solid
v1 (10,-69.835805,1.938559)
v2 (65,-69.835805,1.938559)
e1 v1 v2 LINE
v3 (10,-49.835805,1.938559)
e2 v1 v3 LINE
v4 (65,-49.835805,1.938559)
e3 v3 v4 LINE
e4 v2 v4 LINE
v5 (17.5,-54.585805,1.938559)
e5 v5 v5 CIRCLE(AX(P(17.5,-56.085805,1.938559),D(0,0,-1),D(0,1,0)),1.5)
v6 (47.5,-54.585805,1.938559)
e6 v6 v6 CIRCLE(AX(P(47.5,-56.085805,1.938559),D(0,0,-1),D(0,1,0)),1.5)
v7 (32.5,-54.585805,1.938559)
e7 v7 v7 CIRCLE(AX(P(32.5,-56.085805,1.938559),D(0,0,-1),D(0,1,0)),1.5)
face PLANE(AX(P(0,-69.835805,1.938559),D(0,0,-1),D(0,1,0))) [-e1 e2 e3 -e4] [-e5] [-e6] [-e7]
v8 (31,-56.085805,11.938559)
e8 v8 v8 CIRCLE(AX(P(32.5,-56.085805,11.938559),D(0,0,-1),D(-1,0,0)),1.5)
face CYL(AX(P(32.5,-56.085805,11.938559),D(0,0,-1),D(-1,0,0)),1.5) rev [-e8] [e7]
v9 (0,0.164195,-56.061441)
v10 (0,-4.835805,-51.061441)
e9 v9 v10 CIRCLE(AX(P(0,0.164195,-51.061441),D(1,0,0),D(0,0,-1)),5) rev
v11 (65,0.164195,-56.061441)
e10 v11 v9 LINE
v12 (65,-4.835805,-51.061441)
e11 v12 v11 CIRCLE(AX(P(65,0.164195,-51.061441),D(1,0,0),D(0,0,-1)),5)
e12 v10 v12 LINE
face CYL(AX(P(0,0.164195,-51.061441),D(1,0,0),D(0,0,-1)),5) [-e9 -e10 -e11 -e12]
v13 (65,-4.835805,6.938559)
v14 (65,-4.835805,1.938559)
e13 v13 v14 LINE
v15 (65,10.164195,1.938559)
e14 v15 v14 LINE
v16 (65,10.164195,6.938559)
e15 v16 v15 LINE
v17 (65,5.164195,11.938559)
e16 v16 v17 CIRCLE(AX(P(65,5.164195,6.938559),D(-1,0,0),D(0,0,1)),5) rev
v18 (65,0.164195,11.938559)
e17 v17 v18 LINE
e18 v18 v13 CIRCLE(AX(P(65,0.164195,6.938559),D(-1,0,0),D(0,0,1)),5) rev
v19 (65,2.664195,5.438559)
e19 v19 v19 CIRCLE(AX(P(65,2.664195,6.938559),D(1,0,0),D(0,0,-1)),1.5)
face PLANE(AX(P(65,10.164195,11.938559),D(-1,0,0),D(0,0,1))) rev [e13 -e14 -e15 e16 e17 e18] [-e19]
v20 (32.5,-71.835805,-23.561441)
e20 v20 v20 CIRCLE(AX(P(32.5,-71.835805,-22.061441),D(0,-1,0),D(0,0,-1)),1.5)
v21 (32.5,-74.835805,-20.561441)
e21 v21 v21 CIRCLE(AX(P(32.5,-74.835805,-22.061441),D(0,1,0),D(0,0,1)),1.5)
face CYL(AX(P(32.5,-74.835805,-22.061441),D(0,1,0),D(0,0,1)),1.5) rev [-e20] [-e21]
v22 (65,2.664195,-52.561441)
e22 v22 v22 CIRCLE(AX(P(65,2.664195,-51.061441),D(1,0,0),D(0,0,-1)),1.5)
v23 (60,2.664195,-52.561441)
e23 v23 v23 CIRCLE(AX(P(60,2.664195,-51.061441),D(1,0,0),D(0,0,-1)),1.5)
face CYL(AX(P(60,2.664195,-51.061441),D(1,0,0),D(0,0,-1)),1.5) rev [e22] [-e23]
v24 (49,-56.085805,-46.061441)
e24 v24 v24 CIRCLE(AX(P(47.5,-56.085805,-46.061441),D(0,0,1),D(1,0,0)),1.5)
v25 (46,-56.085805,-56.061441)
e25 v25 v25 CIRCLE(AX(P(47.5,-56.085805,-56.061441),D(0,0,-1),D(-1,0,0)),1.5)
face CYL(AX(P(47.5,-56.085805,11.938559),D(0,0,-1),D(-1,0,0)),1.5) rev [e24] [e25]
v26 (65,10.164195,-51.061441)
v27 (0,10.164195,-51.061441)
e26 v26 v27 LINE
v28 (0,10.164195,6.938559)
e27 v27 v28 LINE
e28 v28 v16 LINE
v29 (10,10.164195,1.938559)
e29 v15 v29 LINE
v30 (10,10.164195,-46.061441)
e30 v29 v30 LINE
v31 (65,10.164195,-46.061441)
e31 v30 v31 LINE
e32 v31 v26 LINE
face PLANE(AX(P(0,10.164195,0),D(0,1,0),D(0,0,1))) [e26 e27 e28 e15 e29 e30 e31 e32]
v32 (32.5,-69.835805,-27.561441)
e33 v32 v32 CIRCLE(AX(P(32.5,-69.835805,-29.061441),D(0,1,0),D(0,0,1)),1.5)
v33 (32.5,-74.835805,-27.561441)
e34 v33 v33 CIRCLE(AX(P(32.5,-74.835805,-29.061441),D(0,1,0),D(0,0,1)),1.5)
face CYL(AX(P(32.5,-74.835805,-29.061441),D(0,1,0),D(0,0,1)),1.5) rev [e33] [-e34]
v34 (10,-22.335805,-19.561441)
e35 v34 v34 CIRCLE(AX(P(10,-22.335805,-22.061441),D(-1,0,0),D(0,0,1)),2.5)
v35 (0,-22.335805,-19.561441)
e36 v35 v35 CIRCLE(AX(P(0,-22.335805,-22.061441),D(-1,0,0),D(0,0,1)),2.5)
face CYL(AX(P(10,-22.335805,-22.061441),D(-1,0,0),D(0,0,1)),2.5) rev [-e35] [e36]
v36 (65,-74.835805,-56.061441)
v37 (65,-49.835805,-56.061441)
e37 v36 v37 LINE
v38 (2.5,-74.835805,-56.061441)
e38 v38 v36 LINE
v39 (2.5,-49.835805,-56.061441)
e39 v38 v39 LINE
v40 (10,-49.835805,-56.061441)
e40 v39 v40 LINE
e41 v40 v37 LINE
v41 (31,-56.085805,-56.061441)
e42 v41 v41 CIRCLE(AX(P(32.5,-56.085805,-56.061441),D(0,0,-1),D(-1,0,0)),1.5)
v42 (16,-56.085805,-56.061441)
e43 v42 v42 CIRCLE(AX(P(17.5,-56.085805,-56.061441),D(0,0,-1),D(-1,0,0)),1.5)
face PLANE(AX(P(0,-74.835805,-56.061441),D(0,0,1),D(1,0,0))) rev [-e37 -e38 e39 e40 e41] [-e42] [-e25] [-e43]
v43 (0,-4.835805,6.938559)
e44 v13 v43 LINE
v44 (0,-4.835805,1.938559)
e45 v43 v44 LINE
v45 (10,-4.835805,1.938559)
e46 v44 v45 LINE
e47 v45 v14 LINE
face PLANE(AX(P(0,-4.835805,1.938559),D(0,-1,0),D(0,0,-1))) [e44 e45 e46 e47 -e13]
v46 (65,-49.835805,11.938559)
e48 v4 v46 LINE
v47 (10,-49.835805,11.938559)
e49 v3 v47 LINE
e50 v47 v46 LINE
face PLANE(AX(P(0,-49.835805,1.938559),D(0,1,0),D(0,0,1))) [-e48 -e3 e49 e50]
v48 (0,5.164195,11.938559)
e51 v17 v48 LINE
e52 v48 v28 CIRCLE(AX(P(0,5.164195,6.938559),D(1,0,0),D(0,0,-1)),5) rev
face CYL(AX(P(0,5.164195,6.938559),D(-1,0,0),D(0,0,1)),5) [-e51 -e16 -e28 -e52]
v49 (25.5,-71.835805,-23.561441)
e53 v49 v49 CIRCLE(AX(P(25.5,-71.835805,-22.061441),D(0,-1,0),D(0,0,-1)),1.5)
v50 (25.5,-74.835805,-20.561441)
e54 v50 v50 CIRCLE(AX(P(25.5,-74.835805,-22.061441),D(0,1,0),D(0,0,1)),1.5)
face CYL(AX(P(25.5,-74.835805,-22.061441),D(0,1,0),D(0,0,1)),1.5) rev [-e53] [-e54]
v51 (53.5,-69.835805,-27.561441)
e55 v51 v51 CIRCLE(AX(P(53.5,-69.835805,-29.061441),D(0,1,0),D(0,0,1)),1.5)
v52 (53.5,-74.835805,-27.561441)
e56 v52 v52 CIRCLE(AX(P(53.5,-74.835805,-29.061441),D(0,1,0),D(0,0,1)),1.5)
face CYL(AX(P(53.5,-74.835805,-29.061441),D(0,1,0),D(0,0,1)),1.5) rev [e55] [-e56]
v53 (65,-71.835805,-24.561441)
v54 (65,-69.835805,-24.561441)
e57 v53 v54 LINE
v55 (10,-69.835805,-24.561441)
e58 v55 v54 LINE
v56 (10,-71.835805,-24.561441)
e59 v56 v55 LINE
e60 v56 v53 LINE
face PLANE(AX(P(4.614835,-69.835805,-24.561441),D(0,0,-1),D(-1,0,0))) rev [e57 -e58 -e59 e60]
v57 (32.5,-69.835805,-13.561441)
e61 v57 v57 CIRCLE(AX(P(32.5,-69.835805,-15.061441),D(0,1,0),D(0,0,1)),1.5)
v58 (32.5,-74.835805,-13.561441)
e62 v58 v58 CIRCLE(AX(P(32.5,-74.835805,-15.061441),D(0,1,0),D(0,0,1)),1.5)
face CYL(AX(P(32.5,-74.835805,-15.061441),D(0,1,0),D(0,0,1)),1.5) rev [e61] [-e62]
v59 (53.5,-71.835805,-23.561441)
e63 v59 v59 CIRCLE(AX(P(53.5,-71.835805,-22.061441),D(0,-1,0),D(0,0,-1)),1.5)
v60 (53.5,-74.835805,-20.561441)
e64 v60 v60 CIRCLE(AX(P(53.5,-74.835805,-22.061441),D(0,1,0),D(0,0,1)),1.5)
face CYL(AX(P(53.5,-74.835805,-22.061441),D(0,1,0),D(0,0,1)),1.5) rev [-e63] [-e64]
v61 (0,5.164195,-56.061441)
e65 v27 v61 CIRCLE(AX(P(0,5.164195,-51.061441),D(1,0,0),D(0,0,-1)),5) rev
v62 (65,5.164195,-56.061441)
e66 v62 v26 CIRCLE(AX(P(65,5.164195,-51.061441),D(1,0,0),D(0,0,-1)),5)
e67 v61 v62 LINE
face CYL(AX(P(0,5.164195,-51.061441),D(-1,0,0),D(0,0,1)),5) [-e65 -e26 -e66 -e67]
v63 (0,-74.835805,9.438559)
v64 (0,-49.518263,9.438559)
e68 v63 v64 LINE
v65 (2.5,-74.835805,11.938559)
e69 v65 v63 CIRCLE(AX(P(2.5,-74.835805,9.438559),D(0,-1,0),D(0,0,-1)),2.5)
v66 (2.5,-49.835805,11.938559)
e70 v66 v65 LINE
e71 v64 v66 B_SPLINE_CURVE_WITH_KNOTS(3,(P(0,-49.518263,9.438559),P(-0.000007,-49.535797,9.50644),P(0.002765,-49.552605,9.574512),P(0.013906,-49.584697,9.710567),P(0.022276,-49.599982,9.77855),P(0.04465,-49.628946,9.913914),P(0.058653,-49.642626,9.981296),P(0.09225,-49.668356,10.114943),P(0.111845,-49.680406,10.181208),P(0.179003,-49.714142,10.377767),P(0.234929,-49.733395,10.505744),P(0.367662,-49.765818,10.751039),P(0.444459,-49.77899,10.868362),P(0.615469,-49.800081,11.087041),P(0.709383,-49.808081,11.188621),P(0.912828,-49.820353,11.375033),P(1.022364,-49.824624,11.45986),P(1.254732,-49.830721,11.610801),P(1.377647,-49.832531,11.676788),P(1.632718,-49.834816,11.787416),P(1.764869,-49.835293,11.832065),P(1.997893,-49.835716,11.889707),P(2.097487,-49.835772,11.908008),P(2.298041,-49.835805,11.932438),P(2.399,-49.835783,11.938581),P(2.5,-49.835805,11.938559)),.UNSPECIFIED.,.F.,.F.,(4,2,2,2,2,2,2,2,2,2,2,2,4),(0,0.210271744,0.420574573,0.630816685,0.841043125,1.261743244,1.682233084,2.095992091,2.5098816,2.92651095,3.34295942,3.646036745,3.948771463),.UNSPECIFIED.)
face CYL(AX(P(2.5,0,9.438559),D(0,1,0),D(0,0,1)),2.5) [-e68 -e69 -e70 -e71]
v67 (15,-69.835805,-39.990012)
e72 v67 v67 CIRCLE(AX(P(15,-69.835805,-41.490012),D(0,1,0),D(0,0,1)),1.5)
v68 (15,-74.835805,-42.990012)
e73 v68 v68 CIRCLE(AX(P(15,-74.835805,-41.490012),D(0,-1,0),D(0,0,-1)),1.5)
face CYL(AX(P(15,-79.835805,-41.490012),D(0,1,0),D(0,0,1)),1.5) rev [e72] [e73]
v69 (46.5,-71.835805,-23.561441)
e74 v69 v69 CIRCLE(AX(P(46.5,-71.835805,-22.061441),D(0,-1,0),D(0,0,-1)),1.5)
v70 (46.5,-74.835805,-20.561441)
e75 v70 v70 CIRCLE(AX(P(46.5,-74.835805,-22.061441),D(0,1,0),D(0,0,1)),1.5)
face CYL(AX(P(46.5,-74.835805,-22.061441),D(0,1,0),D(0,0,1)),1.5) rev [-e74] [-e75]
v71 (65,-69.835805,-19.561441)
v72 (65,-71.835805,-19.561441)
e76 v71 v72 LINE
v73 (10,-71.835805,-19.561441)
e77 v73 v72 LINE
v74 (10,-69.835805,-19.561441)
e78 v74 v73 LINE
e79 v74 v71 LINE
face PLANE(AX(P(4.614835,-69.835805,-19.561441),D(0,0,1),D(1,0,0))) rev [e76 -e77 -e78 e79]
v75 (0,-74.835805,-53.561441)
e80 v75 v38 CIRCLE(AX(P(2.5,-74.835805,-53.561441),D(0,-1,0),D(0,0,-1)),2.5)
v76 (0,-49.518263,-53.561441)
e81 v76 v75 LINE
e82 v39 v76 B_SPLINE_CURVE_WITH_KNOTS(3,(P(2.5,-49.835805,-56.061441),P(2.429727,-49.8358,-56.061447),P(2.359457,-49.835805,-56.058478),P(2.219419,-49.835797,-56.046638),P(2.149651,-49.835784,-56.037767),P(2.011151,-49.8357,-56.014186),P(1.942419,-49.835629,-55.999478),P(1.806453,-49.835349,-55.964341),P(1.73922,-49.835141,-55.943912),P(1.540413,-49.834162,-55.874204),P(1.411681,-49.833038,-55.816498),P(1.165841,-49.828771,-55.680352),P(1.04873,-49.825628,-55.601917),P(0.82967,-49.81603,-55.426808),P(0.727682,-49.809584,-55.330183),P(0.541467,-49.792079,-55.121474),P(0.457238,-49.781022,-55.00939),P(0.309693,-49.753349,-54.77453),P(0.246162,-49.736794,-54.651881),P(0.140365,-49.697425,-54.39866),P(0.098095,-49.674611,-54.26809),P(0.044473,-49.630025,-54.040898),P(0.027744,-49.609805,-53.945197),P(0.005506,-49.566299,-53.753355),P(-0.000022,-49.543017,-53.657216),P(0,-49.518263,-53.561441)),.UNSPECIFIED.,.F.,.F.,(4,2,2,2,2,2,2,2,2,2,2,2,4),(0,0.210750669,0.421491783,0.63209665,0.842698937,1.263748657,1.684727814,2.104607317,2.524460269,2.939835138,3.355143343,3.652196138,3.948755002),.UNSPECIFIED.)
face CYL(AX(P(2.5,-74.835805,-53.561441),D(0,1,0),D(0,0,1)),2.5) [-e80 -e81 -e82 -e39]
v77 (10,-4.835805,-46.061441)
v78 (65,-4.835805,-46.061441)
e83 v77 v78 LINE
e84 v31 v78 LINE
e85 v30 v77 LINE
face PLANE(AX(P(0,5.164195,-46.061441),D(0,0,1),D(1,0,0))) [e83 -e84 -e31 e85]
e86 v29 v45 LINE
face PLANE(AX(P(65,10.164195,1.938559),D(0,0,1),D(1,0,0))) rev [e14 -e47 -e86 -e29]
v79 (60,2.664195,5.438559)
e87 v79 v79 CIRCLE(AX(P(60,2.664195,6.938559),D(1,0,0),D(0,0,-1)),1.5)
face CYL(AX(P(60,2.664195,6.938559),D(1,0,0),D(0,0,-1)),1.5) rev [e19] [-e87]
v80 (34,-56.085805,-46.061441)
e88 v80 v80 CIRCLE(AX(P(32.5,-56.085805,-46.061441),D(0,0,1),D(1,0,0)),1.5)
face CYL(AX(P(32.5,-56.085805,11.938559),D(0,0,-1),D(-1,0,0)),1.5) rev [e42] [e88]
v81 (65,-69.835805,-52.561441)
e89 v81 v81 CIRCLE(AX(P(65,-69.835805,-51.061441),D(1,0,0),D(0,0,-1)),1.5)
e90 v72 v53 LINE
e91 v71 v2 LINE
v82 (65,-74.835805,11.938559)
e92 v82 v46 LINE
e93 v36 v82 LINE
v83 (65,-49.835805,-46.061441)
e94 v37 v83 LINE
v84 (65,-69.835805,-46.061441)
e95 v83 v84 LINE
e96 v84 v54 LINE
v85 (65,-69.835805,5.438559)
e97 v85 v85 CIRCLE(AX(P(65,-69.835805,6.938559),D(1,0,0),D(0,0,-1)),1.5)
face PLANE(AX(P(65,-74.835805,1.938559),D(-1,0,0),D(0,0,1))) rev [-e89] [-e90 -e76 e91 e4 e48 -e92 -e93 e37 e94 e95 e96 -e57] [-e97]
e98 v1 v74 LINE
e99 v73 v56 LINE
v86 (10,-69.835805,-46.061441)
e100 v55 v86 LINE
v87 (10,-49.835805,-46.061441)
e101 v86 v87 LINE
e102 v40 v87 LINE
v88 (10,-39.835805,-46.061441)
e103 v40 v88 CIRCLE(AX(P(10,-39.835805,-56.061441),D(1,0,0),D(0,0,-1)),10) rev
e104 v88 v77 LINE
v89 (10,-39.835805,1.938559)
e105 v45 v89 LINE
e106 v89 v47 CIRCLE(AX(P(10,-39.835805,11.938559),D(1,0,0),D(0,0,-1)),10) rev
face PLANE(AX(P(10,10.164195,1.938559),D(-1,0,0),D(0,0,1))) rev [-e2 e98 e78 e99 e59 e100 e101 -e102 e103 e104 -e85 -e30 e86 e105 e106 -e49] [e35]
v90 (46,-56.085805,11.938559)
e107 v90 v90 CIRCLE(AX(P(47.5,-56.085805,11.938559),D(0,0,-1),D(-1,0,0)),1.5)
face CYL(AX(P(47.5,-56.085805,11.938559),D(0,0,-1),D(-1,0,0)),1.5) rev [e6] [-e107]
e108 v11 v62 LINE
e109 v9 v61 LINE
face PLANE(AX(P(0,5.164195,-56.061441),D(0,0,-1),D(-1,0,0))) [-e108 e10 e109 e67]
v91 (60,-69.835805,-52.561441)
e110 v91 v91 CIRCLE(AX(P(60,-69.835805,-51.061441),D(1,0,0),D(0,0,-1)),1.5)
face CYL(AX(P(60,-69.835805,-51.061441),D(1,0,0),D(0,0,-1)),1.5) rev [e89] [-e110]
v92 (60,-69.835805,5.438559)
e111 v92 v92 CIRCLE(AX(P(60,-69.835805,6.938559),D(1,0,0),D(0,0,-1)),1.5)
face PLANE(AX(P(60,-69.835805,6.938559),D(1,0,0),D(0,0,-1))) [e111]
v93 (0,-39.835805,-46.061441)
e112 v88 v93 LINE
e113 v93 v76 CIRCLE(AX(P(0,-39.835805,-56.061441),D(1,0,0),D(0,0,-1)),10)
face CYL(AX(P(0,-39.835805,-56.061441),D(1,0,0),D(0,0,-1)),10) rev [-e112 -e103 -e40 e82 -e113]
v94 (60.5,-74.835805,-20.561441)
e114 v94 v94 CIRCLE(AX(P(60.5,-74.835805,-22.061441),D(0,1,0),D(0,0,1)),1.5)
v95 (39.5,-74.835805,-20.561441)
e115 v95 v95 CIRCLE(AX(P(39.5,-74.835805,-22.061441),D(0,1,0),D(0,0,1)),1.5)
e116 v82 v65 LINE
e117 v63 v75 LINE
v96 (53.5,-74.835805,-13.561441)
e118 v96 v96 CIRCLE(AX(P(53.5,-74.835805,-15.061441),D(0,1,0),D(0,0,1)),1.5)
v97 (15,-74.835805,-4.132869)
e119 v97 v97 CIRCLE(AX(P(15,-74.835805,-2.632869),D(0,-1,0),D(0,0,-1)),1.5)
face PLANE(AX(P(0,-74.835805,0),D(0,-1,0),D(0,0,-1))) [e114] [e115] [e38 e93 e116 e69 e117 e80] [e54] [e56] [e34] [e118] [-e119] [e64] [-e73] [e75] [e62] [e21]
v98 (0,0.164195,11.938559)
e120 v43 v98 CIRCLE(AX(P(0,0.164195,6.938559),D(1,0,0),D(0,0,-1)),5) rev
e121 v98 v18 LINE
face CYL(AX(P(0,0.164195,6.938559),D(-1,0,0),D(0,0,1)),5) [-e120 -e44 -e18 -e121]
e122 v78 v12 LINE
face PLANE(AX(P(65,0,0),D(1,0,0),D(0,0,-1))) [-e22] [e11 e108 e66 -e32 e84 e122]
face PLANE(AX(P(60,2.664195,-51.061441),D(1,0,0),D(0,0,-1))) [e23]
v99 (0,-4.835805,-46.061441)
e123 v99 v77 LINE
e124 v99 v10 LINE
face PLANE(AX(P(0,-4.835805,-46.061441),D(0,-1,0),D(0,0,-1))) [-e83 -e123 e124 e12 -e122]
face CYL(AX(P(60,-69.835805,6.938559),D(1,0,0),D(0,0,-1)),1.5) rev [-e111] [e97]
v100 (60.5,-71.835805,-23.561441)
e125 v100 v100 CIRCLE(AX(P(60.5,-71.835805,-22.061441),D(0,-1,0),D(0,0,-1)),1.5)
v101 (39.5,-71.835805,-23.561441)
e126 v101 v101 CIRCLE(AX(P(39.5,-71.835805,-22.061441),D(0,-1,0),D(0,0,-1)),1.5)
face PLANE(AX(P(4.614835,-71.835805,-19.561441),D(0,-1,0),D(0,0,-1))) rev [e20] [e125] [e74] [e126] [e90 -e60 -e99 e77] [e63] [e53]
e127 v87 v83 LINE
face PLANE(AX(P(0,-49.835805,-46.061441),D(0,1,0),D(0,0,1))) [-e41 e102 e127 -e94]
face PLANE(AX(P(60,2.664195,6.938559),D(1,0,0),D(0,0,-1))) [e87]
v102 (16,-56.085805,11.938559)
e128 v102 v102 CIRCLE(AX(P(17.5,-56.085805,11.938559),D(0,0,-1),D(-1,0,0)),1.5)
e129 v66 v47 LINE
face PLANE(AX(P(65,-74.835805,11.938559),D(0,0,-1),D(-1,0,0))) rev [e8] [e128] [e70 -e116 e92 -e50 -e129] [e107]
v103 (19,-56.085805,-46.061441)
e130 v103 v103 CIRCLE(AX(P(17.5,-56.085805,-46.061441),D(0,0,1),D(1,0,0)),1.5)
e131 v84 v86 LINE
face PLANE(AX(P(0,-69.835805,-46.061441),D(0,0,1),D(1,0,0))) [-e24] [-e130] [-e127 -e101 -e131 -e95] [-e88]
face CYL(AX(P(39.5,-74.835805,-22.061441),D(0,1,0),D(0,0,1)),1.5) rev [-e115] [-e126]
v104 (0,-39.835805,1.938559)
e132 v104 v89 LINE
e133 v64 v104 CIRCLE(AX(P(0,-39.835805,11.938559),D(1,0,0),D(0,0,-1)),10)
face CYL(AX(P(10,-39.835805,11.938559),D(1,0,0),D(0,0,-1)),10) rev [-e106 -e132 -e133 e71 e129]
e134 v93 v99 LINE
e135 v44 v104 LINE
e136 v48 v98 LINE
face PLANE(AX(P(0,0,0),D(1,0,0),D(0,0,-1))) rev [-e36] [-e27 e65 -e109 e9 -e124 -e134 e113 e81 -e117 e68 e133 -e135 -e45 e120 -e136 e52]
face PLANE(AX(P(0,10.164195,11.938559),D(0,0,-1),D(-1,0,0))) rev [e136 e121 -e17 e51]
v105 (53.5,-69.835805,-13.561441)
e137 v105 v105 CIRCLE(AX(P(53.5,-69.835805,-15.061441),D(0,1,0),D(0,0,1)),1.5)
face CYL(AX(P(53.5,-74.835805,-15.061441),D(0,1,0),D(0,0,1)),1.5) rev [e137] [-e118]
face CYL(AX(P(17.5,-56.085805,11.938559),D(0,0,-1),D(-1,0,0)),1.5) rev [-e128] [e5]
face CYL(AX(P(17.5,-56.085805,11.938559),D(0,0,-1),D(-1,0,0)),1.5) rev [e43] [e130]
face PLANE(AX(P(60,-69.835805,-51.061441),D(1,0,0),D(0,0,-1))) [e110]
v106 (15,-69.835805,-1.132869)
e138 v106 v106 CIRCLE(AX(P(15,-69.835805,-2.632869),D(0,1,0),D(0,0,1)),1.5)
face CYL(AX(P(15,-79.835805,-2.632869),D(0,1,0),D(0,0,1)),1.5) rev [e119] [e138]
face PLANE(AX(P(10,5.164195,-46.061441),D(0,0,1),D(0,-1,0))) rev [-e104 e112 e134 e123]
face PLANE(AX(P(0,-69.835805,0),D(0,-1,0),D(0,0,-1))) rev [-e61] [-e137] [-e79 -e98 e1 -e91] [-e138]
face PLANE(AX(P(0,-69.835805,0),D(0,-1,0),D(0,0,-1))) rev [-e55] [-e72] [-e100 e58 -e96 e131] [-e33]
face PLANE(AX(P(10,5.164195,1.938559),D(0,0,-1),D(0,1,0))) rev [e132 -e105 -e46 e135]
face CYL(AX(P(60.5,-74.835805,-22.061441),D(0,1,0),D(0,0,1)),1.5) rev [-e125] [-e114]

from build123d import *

# Parameters (mm, degrees)
SKETCH_2_W                 = 48
SKETCH_2_H                 = 75
EXTRUDE_1_DEPTH            = 10
EXTRUDE_2_DEPTH            = 55
EXTRUDE_2_DEPTH_BACK       = 10
SKETCH_5_W                 = 10
SKETCH_5_H                 = 10
EXTRUDE_2_2_DEPTH          = 55
EXTRUDE_2_2_DEPTH_BACK     = 10
SKETCH_5_H_2               = 20
EXTRUDE_2_3_DEPTH          = 55
EXTRUDE_2_3_DEPTH_BACK     = 10
EXTRUDE_2_4_DEPTH          = 55
EXTRUDE_2_4_DEPTH_BACK     = 10
EXTRUDE_3_DEPTH            = 5
SKETCH_7_R                 = 2.5
CUT_EXTRUDE_1_DEPTH        = 10
FILLET_1_R                 = 10
SKETCH_8_R                 = 1.5
CUT_EXTRUDE_2_DEPTH        = 121.205647632
PATTERN_LINEAR_1_COUNT     = 2
PATTERN_LINEAR_1_PITCH     = 15
PATTERN_LINEAR_1_COL_COUNT = 2
PATTERN_LINEAR_1_COL_PITCH = 15
SKETCH_10_R                = 1.5
CUT_EXTRUDE_4_DEPTH        = 10
SKETCH_11_R                = 1.5
CUT_EXTRUDE_5_DEPTH        = 5
FILLET_9_R                 = 2.5
EXTRUDE_5_DEPTH            = 5
FILLET_10_R                = 5
FILLET_11_R                = 5
SKETCH_14_R                = 1.5
CUT_EXTRUDE_6_DEPTH        = 5
SKETCH_15_W                = 5
SKETCH_15_H                = 2
CUT_EXTRUDE_7_DEPTH        = 55
SKETCH_17_R                = 1.5
CUT_EXTRUDE_10_DEPTH       = 118.336631714


with BuildPart() as part:
    # 草图2 → 凸台-拉伸1 (new body)
    with BuildSketch(Plane(origin=(0, 0, 0), x_dir=(0, 0, -1), z_dir=(1, 0, 0))):
        with Locations((22.061440678, -32.335805085)):
            Rectangle(SKETCH_2_W, SKETCH_2_H)
    extrude(amount=EXTRUDE_1_DEPTH)



with BuildPart() as body_2:
    # 草图5 → 凸台-拉伸2 (new, two sides: drawn at the far end of the back side and taken through both)
    with BuildSketch(Plane(origin=(10, 0, 0), x_dir=(0, 0, -1), z_dir=(1, 0, 0)).offset(-EXTRUDE_2_DEPTH_BACK)):
        with Locations((51.061440678, 0.164194915)):
            Rectangle(SKETCH_5_W, SKETCH_5_H)
    extrude(amount=EXTRUDE_2_DEPTH + EXTRUDE_2_DEPTH_BACK)


with BuildPart() as body_3:
    # 草图5 → Extrude 2 2 (new, two sides: drawn at the far end of the back side and taken through both)
    with BuildSketch(Plane(origin=(10, 0, 0), x_dir=(0, 0, -1), z_dir=(1, 0, 0)).offset(-EXTRUDE_2_2_DEPTH_BACK)):
        with Locations((51.061440678, -59.835805085)):
            Rectangle(SKETCH_5_W, SKETCH_5_H_2)
    extrude(amount=EXTRUDE_2_2_DEPTH + EXTRUDE_2_2_DEPTH_BACK)


with BuildPart() as body_4:
    # 草图5 → Extrude 2 3 (new, two sides: drawn at the far end of the back side and taken through both)
    with BuildSketch(Plane(origin=(10, 0, 0), x_dir=(0, 0, -1), z_dir=(1, 0, 0)).offset(-EXTRUDE_2_3_DEPTH_BACK)):
        with Locations((-6.938559322, -59.835805085)):
            Rectangle(SKETCH_5_W, SKETCH_5_H_2)
    extrude(amount=EXTRUDE_2_3_DEPTH + EXTRUDE_2_3_DEPTH_BACK)


with BuildPart() as body_5:
    # 草图5 → Extrude 2 4 (new, two sides: drawn at the far end of the back side and taken through both)
    with BuildSketch(Plane(origin=(10, 0, 0), x_dir=(0, 0, -1), z_dir=(1, 0, 0)).offset(-EXTRUDE_2_4_DEPTH_BACK)):
        with Locations((-6.938559322, 0.164194915)):
            Rectangle(SKETCH_5_W, SKETCH_5_H)
    extrude(amount=EXTRUDE_2_4_DEPTH + EXTRUDE_2_4_DEPTH_BACK)


with BuildPart() as part_1:
    add(part.part)

    add(body_3.part)  # 凸台-拉伸3 merges body 3

    add(body_4.part)  # 凸台-拉伸3 merges body 4
    # 草图6 → 凸台-拉伸3 (add)
    with BuildSketch(Plane.XZ.offset(69.835805085)):
        Polygon((65, 1.938559322), (65, 11.938559322), (0, 11.938559322), (0, 1.938559322), (0, -46.061440678), (0, -56.061440678), (65, -56.061440678), (65, -46.061440678), align=None)
    extrude(amount=EXTRUDE_3_DEPTH)

    # 草图7 → 切除-拉伸1 (cut)
    with BuildSketch(Plane.ZY):
        with Locations((-22.061440678, -22.335805085)):
            Circle(SKETCH_7_R)
    extrude(amount=-CUT_EXTRUDE_1_DEPTH, mode=Mode.SUBTRACT)

    # 圆角1
    fillet_1_edges = [part_1.edges().sort_by_distance(p)[0] for p in [
        (5, -49.835805085, -46.061440678),
        (5, -49.835805085, 1.938559322),
    ]]
    fillet(fillet_1_edges, radius=FILLET_1_R - 0.0001)  # a hair under: the kernel refuses the full size

    # 草图8 → 切除-拉伸2 (cut, through all)
    with BuildSketch(Plane(origin=(0, 0, -56.061440678), x_dir=(-1, 0, 0), z_dir=(0, 0, -1))):
        with Locations((-32.5, -56.085805085)):
            Circle(SKETCH_8_R)
    cut_extrude_2 = extrude(amount=-CUT_EXTRUDE_2_DEPTH, mode=Mode.SUBTRACT)

    # 阵列(线性)1: 切除-拉伸2 ×2
    with Locations(*[(i * PATTERN_LINEAR_1_PITCH, 0, 0) for i in range(1, PATTERN_LINEAR_1_COUNT)]):
        add(cut_extrude_2, mode=Mode.SUBTRACT)

    # 阵列(线性)1 col: 切除-拉伸2 ×2
    with Locations(*[(-i * PATTERN_LINEAR_1_COL_PITCH, 0, 0) for i in range(1, PATTERN_LINEAR_1_COL_COUNT)]):
        add(cut_extrude_2, mode=Mode.SUBTRACT)

    # 草图10 → 切除-拉伸4 (cut)
    with BuildSketch(Plane(origin=(0, -69.835805085, 0), x_dir=(1, 0, 0), z_dir=(0, 1, 0))):
        with Locations(Location((15, 2.632869249, 0), (0, 0, 270))):
            Circle(SKETCH_10_R)
        with Locations(Location((15, 41.490012107, 0), (0, 0, 270))):
            Circle(SKETCH_10_R)
    extrude(amount=-CUT_EXTRUDE_4_DEPTH, mode=Mode.SUBTRACT)

    # 草图11 → 切除-拉伸5 (cut)
    with BuildSketch(Plane(origin=(65, 0, 0), x_dir=(0, 0, -1), z_dir=(1, 0, 0))):
        with Locations((51.061440678, -69.835805085)):
            Circle(SKETCH_11_R)
        with Locations((-6.938559322, -69.835805085)):
            Circle(SKETCH_11_R)
    extrude(amount=-CUT_EXTRUDE_5_DEPTH, mode=Mode.SUBTRACT)

    # 圆角9
    fillet_9_edges = [part_1.edges().sort_by_distance(p)[0] for p in [
        (0, -62.335805085, -56.061440678),
        (0, -62.335805085, 11.938559322),
    ]]
    fillet(fillet_9_edges, radius=FILLET_9_R)


    add(body_2.part)  # 凸台-拉伸5 merges body 2

    add(body_5.part)  # 凸台-拉伸5 merges body 5
    # 草图13 → 凸台-拉伸5 (add)
    with BuildSketch(Plane(origin=(0, 5.164194915, 0), x_dir=(1, 0, 0), z_dir=(0, 1, 0))):
        Polygon((0, -11.938559322), (65, -11.938559322), (65, -1.938559322), (10, -1.938559322), (10, 46.061440678), (65, 46.061440678), (65, 56.061440678), (0, 56.061440678), (0, 46.061440678), (0, -1.938559322), align=None)
    extrude(amount=EXTRUDE_5_DEPTH)

    # 圆角10
    fillet_10_edges = [part_1.edges().sort_by_distance(p)[0] for p in [
        (32.5, 10.164194915, 11.938559322),
        (32.5, -4.835805085, 11.938559322),
    ]]
    fillet(fillet_10_edges, radius=FILLET_10_R)

    # 圆角11
    fillet_11_edges = [part_1.edges().sort_by_distance(p)[0] for p in [
        (32.5, 10.164194915, -56.061440678),
        (32.5, -4.835805085, -56.061440678),
    ]]
    fillet(fillet_11_edges, radius=FILLET_11_R)

    # 草图14 → 切除-拉伸6 (cut)
    with BuildSketch(Plane(origin=(65, 0, 0), x_dir=(0, 0, -1), z_dir=(1, 0, 0))):
        with Locations((-6.938559322, 2.664194915)):
            Circle(SKETCH_14_R)
        with Locations((51.061440678, 2.664194915)):
            Circle(SKETCH_14_R)
    extrude(amount=-CUT_EXTRUDE_6_DEPTH, mode=Mode.SUBTRACT)

    # 草图15 → 切除-拉伸7 (cut)
    with BuildSketch(Plane(origin=(65, 0, 0), x_dir=(0, 0, -1), z_dir=(1, 0, 0))):
        with Locations((22.061440678, -70.835805085)):
            Rectangle(SKETCH_15_W, SKETCH_15_H)
    extrude(amount=-CUT_EXTRUDE_7_DEPTH, mode=Mode.SUBTRACT)

    # 草图17 → 切除-拉伸10 (cut, through all)
    with BuildSketch(Plane(origin=(0, -69.835805085, 0), x_dir=(1, 0, 0), z_dir=(0, 1, 0))):
        with Locations(Location((60.5, 22.061440678, 0), (0, 0, 270))):
            Circle(SKETCH_17_R)
        with Locations(Location((46.5, 22.061440678, 0), (0, 0, 270))):
            Circle(SKETCH_17_R)
        with Locations(Location((53.5, 29.061440678, 0), (0, 0, 270))):
            Circle(SKETCH_17_R)
        with Locations(Location((53.5, 22.061440678, 0), (0, 0, 270))):
            Circle(SKETCH_17_R)
        with Locations(Location((53.5, 15.061440678, 0), (0, 0, 270))):
            Circle(SKETCH_17_R)
        with Locations(Location((32.5, 15.061440678, 0), (0, 0, 270))):
            Circle(SKETCH_17_R)
        with Locations(Location((39.5, 22.061440678, 0), (0, 0, 270))):
            Circle(SKETCH_17_R)
        with Locations(Location((25.5, 22.061440678, 0), (0, 0, 270))):
            Circle(SKETCH_17_R)
        with Locations(Location((32.5, 22.061440678, 0), (0, 0, 270))):
            Circle(SKETCH_17_R)
        with Locations(Location((32.5, 29.061440678, 0), (0, 0, 270))):
            Circle(SKETCH_17_R)
    extrude(amount=-CUT_EXTRUDE_10_DEPTH, mode=Mode.SUBTRACT)


solid = part_1.part
